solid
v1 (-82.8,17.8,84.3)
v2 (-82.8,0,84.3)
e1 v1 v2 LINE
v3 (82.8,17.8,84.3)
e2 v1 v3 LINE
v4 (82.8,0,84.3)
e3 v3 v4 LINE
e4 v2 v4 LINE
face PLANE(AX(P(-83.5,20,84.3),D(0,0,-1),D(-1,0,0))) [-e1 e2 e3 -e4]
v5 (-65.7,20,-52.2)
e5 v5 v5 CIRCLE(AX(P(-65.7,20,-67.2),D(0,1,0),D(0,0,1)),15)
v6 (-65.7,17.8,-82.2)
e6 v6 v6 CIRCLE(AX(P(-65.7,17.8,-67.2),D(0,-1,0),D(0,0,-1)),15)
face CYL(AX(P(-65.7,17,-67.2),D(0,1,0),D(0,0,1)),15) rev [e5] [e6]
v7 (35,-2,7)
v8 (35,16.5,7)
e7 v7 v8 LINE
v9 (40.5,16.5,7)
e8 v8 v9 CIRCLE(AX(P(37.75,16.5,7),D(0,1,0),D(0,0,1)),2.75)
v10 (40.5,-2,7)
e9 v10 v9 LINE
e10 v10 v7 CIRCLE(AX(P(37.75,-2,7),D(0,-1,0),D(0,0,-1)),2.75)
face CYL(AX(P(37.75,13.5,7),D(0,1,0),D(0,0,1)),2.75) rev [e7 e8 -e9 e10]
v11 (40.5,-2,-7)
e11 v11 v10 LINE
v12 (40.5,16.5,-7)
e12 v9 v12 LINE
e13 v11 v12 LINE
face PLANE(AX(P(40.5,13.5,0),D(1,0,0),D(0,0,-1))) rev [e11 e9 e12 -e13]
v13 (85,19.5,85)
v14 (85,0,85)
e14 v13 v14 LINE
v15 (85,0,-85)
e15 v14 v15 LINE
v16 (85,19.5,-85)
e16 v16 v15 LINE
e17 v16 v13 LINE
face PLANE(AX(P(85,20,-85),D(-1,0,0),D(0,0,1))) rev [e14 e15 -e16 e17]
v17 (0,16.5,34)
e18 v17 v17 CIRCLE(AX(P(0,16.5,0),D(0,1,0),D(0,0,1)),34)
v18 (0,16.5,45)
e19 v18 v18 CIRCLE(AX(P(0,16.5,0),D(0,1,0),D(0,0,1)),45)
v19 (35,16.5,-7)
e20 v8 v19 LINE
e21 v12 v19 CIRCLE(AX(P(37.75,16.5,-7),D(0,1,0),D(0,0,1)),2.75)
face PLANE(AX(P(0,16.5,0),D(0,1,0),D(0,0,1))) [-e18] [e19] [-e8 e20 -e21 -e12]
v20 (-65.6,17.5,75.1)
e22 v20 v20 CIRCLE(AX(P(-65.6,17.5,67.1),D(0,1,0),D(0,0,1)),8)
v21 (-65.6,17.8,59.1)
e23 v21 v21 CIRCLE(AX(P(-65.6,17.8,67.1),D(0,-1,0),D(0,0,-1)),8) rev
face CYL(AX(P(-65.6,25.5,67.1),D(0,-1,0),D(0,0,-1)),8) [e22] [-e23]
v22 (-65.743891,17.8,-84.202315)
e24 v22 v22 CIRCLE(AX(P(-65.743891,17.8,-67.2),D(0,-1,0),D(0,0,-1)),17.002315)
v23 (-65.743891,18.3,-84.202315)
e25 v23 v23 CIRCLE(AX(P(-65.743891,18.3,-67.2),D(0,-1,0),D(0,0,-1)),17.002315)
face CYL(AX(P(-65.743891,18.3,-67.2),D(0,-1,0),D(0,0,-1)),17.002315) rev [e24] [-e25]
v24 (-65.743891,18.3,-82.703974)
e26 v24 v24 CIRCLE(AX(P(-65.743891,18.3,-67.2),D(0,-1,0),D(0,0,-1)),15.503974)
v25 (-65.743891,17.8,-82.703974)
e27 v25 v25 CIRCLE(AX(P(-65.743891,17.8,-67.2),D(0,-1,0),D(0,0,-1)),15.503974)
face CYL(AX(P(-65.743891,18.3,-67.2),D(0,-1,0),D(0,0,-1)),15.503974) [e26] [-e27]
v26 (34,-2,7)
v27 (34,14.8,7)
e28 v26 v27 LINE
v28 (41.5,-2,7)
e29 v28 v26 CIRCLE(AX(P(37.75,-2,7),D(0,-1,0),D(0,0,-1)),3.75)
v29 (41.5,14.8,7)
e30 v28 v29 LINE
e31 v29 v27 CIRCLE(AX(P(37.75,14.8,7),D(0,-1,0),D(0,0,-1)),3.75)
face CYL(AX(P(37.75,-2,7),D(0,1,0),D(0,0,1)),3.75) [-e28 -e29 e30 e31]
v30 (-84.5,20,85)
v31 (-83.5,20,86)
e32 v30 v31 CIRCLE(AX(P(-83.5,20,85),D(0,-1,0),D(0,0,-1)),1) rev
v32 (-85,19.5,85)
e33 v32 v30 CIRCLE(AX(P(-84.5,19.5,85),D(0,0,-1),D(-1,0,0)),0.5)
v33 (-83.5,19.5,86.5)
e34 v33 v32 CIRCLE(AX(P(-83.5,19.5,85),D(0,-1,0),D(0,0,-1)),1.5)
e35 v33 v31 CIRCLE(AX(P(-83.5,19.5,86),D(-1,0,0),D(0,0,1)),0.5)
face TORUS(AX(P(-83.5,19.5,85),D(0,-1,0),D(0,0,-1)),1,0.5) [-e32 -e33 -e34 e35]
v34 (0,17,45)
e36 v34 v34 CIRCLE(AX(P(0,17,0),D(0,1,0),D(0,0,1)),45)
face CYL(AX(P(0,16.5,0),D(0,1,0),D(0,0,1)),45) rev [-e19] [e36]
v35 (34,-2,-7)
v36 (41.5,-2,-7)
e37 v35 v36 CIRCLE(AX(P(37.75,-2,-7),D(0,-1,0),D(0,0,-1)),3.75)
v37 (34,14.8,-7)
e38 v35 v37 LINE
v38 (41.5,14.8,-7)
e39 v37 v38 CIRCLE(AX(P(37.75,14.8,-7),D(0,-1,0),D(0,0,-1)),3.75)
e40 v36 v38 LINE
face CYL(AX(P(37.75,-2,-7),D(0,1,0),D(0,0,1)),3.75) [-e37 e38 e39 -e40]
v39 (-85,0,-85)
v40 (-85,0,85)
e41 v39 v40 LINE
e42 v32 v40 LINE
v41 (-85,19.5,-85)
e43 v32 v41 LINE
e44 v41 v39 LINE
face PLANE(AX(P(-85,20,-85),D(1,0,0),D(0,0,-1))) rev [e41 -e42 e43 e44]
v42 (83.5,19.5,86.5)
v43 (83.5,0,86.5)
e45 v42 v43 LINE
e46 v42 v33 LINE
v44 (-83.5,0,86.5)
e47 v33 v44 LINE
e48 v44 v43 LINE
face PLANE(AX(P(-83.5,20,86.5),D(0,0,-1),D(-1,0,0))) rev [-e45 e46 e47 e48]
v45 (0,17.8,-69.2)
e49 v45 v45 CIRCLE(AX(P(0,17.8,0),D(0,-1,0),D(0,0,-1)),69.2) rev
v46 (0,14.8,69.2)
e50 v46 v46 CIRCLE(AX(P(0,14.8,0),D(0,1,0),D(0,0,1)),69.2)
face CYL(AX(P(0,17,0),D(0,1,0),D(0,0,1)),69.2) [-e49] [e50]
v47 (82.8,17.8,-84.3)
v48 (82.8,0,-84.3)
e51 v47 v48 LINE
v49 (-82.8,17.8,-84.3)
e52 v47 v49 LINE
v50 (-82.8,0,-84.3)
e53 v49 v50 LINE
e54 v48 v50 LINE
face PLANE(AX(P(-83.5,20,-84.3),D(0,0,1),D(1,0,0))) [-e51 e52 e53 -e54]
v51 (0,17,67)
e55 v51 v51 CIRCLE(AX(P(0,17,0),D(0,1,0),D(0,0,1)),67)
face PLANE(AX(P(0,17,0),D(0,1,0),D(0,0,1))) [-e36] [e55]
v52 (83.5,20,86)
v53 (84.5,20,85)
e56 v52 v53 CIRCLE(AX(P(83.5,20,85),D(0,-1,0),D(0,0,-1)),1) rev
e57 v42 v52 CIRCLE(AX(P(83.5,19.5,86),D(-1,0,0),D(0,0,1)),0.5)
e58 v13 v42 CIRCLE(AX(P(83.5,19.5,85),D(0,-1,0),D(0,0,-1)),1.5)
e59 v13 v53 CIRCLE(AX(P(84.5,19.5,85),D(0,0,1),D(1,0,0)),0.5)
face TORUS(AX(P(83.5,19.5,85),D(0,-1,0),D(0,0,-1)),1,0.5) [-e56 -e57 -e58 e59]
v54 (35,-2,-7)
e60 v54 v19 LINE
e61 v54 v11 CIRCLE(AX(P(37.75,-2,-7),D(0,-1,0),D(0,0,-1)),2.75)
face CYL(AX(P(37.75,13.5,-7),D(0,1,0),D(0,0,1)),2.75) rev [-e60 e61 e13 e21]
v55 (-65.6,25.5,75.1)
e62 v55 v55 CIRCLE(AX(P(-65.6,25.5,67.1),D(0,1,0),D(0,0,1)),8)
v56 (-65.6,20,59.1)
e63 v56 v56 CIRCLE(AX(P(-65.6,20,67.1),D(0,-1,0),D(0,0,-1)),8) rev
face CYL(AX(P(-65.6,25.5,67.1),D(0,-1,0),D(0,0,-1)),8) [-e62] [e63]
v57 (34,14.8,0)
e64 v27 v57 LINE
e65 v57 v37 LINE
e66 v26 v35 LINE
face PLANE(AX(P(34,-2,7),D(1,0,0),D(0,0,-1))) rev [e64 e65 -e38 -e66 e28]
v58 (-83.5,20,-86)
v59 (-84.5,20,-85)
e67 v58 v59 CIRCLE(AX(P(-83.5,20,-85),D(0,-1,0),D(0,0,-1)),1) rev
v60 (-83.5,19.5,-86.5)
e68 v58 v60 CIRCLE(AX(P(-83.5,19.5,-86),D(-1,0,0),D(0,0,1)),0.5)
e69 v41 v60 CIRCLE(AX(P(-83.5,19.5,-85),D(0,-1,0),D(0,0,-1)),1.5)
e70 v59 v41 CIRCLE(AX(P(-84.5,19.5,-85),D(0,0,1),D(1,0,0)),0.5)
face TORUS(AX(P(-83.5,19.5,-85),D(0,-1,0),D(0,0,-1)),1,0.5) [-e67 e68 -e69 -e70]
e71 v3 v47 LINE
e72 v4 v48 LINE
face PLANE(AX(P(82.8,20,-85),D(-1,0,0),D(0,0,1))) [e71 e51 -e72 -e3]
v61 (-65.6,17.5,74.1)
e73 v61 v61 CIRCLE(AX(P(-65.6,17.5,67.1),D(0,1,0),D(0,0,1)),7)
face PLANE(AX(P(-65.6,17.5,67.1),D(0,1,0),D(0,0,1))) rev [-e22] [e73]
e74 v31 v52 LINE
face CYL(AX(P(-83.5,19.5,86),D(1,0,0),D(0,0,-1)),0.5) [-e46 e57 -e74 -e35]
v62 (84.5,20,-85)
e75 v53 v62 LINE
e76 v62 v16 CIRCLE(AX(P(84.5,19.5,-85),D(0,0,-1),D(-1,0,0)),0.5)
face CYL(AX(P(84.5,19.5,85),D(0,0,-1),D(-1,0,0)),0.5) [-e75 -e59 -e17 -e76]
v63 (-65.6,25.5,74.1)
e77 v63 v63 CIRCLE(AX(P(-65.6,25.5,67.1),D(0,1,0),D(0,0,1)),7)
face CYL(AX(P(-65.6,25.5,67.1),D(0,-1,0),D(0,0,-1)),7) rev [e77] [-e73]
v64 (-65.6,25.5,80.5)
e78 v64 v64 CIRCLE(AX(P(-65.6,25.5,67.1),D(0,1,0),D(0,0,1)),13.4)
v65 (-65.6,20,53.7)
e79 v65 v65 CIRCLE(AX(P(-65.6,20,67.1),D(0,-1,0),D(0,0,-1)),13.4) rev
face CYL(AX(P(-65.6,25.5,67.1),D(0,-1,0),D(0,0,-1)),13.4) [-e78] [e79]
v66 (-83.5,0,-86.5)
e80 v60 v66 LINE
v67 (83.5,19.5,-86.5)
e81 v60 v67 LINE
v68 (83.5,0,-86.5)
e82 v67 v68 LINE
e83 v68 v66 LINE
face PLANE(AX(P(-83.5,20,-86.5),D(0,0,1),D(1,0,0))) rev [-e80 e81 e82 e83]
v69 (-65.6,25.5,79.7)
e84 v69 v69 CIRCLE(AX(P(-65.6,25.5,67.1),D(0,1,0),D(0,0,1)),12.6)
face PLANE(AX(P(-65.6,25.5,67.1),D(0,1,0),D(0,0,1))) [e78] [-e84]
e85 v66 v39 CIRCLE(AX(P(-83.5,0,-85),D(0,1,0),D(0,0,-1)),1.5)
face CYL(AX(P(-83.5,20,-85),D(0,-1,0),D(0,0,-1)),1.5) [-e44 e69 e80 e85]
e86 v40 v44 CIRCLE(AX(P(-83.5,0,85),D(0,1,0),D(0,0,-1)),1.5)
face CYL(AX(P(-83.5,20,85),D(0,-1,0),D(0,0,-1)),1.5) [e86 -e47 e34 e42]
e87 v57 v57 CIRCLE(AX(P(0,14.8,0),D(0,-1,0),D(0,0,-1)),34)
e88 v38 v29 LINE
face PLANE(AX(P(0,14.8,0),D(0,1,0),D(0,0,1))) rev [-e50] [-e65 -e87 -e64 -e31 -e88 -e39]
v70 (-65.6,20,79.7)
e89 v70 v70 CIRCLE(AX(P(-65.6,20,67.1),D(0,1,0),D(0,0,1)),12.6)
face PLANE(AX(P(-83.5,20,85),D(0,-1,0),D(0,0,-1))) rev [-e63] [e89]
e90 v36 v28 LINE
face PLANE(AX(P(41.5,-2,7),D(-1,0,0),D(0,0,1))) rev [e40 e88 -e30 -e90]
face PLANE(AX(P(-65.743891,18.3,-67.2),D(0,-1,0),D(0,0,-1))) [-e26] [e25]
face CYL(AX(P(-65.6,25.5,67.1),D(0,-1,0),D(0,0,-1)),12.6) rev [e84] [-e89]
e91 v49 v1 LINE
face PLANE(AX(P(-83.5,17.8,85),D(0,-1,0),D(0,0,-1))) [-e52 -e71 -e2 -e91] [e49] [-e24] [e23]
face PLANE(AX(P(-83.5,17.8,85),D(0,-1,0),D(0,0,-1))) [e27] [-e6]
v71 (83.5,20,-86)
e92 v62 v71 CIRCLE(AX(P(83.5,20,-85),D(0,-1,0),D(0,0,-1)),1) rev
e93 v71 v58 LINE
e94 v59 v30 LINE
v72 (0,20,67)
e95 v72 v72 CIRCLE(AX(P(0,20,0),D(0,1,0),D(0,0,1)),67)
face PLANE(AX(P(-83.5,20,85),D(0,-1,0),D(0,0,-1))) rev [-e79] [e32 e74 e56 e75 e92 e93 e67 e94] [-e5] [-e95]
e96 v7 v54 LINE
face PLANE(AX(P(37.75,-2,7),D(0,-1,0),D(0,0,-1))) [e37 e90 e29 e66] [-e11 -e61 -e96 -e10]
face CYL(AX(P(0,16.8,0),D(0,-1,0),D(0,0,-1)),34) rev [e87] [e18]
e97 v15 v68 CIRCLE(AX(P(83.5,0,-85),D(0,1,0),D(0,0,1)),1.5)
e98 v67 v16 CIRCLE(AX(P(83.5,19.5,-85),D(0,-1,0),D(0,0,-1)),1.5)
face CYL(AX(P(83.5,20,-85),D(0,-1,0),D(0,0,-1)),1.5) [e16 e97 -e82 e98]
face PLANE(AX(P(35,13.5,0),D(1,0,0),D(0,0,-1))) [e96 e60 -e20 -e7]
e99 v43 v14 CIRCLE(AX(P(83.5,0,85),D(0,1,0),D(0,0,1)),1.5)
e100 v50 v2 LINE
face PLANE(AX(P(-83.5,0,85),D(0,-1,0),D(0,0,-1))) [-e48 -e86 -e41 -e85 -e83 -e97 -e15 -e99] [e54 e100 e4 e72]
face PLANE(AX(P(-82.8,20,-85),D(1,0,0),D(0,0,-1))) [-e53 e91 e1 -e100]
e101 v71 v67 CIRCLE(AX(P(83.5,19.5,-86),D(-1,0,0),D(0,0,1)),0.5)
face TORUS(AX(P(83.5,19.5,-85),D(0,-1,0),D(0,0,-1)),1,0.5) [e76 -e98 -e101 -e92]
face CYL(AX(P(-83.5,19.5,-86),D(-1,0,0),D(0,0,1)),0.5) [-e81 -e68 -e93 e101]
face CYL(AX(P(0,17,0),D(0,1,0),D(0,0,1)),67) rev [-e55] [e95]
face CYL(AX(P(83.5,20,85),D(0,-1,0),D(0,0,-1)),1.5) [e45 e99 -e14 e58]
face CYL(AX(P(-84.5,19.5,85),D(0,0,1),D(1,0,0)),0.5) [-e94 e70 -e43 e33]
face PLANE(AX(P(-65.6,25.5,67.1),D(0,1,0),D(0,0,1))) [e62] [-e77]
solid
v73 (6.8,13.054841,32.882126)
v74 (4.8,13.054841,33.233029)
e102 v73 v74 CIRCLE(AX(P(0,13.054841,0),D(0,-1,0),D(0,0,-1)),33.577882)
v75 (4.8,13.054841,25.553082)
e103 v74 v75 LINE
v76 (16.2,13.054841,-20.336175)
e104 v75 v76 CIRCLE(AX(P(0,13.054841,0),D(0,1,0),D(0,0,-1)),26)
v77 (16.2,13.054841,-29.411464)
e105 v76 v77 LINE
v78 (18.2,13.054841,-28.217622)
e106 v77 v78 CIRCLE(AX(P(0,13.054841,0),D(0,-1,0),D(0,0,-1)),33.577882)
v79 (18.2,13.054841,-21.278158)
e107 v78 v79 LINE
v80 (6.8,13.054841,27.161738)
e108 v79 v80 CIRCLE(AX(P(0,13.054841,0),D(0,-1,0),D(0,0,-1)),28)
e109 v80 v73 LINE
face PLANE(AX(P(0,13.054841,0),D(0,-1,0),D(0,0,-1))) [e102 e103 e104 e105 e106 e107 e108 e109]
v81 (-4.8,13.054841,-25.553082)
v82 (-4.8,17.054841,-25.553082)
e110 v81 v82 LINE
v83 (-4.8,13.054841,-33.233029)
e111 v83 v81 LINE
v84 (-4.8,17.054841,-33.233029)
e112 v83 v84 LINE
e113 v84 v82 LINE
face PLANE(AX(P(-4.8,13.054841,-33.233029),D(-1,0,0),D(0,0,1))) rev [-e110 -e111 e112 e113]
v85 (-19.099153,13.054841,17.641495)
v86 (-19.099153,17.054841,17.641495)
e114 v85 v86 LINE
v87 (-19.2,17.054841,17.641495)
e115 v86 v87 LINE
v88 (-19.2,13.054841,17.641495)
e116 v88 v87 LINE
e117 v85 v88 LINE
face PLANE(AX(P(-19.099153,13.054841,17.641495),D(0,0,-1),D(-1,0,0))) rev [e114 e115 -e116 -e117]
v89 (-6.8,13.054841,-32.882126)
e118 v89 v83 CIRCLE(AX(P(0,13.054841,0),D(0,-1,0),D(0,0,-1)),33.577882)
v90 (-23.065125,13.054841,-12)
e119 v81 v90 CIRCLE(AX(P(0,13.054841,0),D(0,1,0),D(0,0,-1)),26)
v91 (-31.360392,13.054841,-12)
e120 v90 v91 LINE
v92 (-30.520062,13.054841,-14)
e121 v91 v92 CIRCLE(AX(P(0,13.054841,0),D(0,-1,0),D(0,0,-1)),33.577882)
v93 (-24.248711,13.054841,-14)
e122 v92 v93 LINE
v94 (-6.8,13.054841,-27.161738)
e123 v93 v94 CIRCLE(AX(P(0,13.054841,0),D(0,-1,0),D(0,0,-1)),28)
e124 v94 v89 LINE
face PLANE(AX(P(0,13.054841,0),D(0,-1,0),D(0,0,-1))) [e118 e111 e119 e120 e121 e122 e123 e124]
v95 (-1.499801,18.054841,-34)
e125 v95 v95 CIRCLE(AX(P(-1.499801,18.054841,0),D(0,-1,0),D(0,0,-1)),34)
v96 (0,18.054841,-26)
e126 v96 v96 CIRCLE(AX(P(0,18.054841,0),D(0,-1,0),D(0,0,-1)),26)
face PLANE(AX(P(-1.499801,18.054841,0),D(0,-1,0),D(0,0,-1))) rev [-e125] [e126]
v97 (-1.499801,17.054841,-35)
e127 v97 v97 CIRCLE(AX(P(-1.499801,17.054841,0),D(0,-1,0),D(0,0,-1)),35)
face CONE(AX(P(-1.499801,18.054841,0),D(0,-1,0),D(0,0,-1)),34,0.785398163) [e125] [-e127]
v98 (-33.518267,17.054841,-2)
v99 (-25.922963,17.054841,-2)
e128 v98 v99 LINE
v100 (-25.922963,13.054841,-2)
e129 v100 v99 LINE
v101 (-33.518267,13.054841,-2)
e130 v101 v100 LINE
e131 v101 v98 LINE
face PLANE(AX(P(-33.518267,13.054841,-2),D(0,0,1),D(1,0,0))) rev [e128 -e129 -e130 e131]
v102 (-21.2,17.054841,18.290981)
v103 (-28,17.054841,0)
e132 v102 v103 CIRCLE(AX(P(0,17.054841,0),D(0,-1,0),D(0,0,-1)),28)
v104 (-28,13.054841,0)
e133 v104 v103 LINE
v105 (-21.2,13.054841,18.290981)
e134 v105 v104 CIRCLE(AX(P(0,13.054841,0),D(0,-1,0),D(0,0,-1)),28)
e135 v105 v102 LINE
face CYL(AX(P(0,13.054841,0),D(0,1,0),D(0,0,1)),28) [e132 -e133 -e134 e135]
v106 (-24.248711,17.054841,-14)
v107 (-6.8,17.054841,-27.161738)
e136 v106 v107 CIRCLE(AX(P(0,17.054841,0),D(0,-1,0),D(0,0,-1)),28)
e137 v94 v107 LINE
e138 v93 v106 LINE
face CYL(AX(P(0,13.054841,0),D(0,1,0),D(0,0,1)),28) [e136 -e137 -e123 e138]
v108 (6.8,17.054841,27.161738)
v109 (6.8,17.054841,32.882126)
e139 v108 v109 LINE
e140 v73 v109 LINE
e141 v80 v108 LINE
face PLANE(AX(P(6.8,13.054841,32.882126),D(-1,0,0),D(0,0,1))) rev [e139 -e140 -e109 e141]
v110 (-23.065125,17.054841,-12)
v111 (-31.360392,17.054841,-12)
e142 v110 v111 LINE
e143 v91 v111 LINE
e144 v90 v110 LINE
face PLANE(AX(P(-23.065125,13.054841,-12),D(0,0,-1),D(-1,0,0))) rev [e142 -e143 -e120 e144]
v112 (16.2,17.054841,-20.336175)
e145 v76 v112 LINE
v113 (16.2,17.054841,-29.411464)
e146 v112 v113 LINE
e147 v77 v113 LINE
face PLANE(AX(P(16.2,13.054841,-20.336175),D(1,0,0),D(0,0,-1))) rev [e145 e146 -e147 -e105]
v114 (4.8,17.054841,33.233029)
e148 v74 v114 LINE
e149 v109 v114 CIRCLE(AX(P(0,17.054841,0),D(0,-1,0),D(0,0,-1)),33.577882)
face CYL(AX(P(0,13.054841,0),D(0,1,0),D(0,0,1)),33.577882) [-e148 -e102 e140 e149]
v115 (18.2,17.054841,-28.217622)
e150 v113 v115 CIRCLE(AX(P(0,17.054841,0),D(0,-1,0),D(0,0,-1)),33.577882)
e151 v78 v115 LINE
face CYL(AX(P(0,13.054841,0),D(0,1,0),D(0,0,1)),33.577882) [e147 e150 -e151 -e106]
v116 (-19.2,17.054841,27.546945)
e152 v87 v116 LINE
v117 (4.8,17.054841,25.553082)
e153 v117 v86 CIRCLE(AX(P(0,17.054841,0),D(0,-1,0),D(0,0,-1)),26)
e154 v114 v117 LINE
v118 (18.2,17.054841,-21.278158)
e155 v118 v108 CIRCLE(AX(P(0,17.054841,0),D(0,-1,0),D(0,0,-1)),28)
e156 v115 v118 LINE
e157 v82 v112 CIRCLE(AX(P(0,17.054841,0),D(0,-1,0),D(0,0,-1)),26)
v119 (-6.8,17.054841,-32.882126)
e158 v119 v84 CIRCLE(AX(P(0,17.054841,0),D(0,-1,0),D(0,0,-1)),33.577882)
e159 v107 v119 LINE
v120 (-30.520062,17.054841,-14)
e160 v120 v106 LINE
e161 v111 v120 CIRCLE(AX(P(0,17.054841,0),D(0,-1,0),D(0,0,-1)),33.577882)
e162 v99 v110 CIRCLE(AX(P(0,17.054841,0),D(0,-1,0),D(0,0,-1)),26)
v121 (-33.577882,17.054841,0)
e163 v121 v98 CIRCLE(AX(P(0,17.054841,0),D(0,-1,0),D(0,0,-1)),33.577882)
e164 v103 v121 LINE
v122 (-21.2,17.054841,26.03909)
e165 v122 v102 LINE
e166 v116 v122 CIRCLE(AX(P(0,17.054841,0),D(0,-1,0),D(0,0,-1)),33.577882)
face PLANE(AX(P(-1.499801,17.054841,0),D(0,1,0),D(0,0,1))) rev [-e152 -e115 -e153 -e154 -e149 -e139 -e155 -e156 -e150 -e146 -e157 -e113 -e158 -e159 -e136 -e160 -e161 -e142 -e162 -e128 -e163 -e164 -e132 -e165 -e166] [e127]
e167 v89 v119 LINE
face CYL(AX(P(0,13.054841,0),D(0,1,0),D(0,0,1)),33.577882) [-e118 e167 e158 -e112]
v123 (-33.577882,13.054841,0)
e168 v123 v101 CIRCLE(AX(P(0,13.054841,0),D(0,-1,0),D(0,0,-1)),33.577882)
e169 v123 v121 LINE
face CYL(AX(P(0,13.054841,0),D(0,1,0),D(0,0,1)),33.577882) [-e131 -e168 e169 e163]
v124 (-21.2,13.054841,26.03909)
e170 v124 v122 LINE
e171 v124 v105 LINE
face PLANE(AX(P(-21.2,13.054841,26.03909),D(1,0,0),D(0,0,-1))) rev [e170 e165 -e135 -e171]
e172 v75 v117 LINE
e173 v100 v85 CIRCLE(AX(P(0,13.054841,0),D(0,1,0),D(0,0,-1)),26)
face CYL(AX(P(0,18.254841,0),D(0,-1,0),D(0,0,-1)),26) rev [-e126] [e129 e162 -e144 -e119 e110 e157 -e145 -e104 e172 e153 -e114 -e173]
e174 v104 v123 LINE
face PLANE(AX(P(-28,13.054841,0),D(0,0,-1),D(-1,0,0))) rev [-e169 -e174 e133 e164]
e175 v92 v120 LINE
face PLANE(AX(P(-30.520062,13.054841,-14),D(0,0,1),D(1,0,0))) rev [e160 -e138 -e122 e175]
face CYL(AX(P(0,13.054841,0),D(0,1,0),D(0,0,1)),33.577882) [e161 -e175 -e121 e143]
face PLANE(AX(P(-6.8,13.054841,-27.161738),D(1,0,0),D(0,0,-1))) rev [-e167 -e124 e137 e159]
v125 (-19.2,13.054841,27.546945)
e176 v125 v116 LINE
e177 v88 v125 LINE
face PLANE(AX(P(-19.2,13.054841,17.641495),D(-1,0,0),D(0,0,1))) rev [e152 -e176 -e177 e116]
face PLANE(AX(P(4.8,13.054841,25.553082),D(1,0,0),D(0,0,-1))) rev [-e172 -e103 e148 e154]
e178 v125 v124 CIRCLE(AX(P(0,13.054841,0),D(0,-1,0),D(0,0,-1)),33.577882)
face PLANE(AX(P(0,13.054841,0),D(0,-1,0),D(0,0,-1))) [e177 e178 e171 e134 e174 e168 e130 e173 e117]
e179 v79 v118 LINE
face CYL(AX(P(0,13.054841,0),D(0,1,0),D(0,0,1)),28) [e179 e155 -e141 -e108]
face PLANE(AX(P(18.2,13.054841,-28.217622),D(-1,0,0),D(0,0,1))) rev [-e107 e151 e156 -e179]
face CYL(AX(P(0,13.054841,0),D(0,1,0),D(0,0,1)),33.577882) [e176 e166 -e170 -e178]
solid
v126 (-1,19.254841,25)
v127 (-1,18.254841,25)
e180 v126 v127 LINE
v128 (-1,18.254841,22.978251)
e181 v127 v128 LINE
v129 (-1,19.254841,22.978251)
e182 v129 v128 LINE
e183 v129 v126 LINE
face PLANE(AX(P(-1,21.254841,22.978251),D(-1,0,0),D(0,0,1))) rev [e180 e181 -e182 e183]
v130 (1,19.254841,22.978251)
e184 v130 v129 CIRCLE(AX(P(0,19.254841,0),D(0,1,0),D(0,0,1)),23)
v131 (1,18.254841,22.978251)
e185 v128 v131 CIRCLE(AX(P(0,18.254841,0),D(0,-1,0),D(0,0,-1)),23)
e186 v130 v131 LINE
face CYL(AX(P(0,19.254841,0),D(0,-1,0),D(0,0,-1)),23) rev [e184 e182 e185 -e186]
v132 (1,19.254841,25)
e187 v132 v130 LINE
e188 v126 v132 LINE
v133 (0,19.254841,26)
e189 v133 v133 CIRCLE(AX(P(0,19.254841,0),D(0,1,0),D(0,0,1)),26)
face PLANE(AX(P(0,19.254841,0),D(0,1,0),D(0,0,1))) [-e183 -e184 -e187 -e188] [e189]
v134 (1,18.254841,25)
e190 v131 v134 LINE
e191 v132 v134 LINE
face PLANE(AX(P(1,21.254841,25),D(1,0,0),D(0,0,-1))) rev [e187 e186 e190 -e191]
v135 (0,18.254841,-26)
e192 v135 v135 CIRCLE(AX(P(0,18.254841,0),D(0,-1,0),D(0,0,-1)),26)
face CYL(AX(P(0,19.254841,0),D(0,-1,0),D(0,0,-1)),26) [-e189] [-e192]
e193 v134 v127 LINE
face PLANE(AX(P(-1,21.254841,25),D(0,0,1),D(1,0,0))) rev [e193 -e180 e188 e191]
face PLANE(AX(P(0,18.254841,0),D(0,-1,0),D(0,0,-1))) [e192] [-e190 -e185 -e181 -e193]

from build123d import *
from build123d.topology import SkipClean

# Parameters (mm, degrees)
EXTRUDE_1_DEPTH          = 20
SKETCH_4_R               = 67
CUT_EXTRUDE_2_DEPTH      = 3
SHELL_9_T                = -2.2
SKETCH_9_R               = 45
CUT_EXTRUDE_3_DEPTH      = 0.5
SKETCH_11_R              = 26
SKETCH_11_R_2            = 23
EXTRUDE_2_DEPTH          = 1.2
SKETCH_14_R              = 23
CUT_EXTRUDE_4_DEPTH      = 5
SKETCH_15_R              = 34
CUT_EXTRUDE_5_DEPTH      = 2
SKETCH_16_R              = 26
CUT_EXTRUDE_9_DEPTH      = 1.2
EXTRUDE_4_DEPTH          = 4
CUT_EXTRUDE_10_DEPTH     = 3
CUT_EXTRUDE_START        = 17.8
CUT_EXTRUDE_11_OUTLINE_R = 15
CUT_EXTRUDE_11_DEPTH     = 2.2
SKETCH_25_R              = 17.002315459
SKETCH_25_R_2            = 15.503974497
CUT_EXTRUDE_12_DEPTH     = 0.5
SKETCH_26_R              = 13.4
SKETCH_26_R_2            = 12.6
EXTRUDE_5_DEPTH          = 5.5
EXTRUDE_6_DEPTH          = 5.5
EXTRUDE_6_DEPTH_BACK     = 2.5
SKETCH_27_R              = 8
SKETCH_27_R_2            = 7
SKETCH_28_R              = 7
CUT_EXTRUDE_13_DEPTH     = 3
FILLET_1_R               = 0.5
CUT_EXTRUDE_14_DEPTH     = 3
EXTRUDE_7_DEPTH          = 16.8


# Read off the part's stored shape, not the designer's step: 切除-拉伸11
with BuildPart() as part:
    # 草图2 → 凸台-拉伸1 (new body)
    with BuildSketch(Plane(origin=(0, 0, 0), x_dir=(1, 0, 0), z_dir=(0, 1, 0))):
        with BuildLine():
            Line((-83.5, 86.5), (83.5, 86.5))
            ThreePointArc((83.5, 86.5), (84.560660172, 86.060660172), (85, 85))
            Line((85, 85), (85, -85))
            ThreePointArc((85, -85), (84.560660172, -86.060660172), (83.5, -86.5))
            Line((83.5, -86.5), (-83.5, -86.5))
            ThreePointArc((-83.5, -86.5), (-84.560660172, -86.060660172), (-85, -85))
            Line((-85, -85), (-85, 85))
            ThreePointArc((-85, 85), (-84.560660172, 86.060660172), (-83.5, 86.5))
        make_face()
    extrude(amount=EXTRUDE_1_DEPTH)

    # 草图4 → 切除-拉伸2 (cut)
    with BuildSketch(Plane(origin=(0, 20, 0), x_dir=(1, 0, 0), z_dir=(0, 1, 0))):
        with Locations(Location((0, 0, 0), (0, 0, 270))):
            Circle(SKETCH_4_R)
    extrude(amount=-CUT_EXTRUDE_2_DEPTH, mode=Mode.SUBTRACT)

    # 抽壳9
    shell_9_openings = [part.faces().sort_by_distance(p)[0] for p in [
        (0, 0, 0),
    ]]
    offset(amount=SHELL_9_T, openings=shell_9_openings, kind=Kind.INTERSECTION)

    # 草图9 → 切除-拉伸3 (cut)
    with BuildSketch(Plane(origin=(0, 17, 0), x_dir=(1, 0, 0), z_dir=(0, 1, 0))):
        with Locations(Location((0, 0, 0), (0, 0, 270))):
            Circle(SKETCH_9_R)
    extrude(amount=-CUT_EXTRUDE_3_DEPTH, mode=Mode.SUBTRACT)


with BuildPart() as body_2:
    # 草图10 → 旋转1 (revolve)
    with BuildSketch(Plane.XY, mode=Mode.PRIVATE) as revolve_1_sk:
        Polygon((-1.499800563, 17.05484119), (-36.499800563, 17.05484119), (-35.499800563, 18.05484119), (-1.499800563, 18.05484119), align=None)
    revolve(revolve_1_sk.sketch.rotate(Axis((-1.499800563, 17.05484119, 0), (0, 1, 0)), 270), axis=Axis((-1.499800563, 17.05484119, 0), (0, 1, 0)))

    # 草图11 → 凸台-拉伸2 (add)
    with BuildSketch(Plane(origin=(0, 18.05484119, 0), x_dir=(1, 0, 0), z_dir=(0, 1, 0))):
        with Locations(Location((0, 0, 0), (0, 0, 90))):
            Circle(SKETCH_11_R)
        with Locations(Location((0, 0, 0), (0, 0, 270))):
            Circle(SKETCH_11_R_2, mode=Mode.SUBTRACT)
    extrude(amount=EXTRUDE_2_DEPTH)


with BuildPart() as cut_extrude_4_tool:
    # 草图14 → 切除-拉伸4 (new body)
    with BuildSketch(Plane(origin=(0, 18.05484119, 0), x_dir=(1, 0, 0), z_dir=(0, 1, 0))):
        with Locations(Location((0, 0, 0), (0, 0, 270))):
            Circle(SKETCH_14_R)
    extrude(amount=-CUT_EXTRUDE_4_DEPTH)


with BuildPart() as part_1:
    add(part.part)

    # 切除-拉伸4: cut by cut_extrude_4_tool
    add(cut_extrude_4_tool.part, mode=Mode.SUBTRACT)

    # 草图15 → 切除-拉伸5 (cut)
    with BuildSketch(Plane.XZ.offset(-14.8)):
        with Locations(Location((0, 0, 0), (0, 0, 270))):
            Circle(SKETCH_15_R)
    extrude(amount=-CUT_EXTRUDE_5_DEPTH, mode=Mode.SUBTRACT)

    # 切除-拉伸11 outline → 切除-拉伸11 (cut)
    with BuildSketch(Plane(origin=(0, 0, 0), x_dir=(1, 0, 0), z_dir=(0, 1, 0)).offset(CUT_EXTRUDE_START)):
        with Locations((-65.7, 67.2)):
            Circle(CUT_EXTRUDE_11_OUTLINE_R)
    extrude(amount=CUT_EXTRUDE_11_DEPTH, mode=Mode.SUBTRACT)

    # 草图25 → 切除-拉伸12 (cut)
    with BuildSketch(Plane.XZ.offset(-17.8)):
        with Locations(Location((-65.7438908, -67.2, 0), (0, 0, 270))):
            Circle(SKETCH_25_R)
        with Locations(Location((-65.7438908, -67.2, 0), (0, 0, 270))):
            Circle(SKETCH_25_R_2, mode=Mode.SUBTRACT)
    extrude(amount=-CUT_EXTRUDE_12_DEPTH, mode=Mode.SUBTRACT)

    # 草图26 → 凸台-拉伸5 (add)
    with BuildSketch(Plane(origin=(0, 20, 0), x_dir=(1, 0, 0), z_dir=(0, 1, 0))):
        with Locations(Location((-65.6, -67.1, 0), (0, 0, 90))):
            Circle(SKETCH_26_R)
        with Locations(Location((-65.6, -67.1, 0), (0, 0, 270))):
            Circle(SKETCH_26_R_2, mode=Mode.SUBTRACT)
    extrude(amount=EXTRUDE_5_DEPTH)

    # 草图27 → 凸台-拉伸6 (add, two sides: drawn at the far end of the back side and taken through both)
    with BuildSketch(Plane(origin=(0, 20, 0), x_dir=(1, 0, 0), z_dir=(0, 1, 0)).offset(-EXTRUDE_6_DEPTH_BACK)):
        with Locations(Location((-65.6, -67.1, 0), (0, 0, 90))):
            Circle(SKETCH_27_R)
        with Locations(Location((-65.6, -67.1, 0), (0, 0, 90))):
            Circle(SKETCH_27_R_2, mode=Mode.SUBTRACT)
    extrude(amount=EXTRUDE_6_DEPTH + EXTRUDE_6_DEPTH_BACK)

    # 草图28 → 切除-拉伸13 (cut)
    with SkipClean():  # the faces are left unmerged after this step: merging them gives an invalid solid
        with BuildSketch(Plane(origin=(0, 20, 0), x_dir=(1, 0, 0), z_dir=(0, 1, 0))):
            with Locations(Location((-65.6, -67.1, 0), (0, 0, 270))):
                Circle(SKETCH_28_R)
        extrude(amount=-CUT_EXTRUDE_13_DEPTH, mode=Mode.SUBTRACT)
    add(part_1.part.scale(1), mode=Mode.REPLACE)  # the faces are merged on a copy

    # 圆角1
    fillet_1_edges = [part_1.edges().sort_by_distance(p)[0] for p in [
        (84.560660172, 20, 86.060660172),
        (85, 20, 0),
        (84.560660172, 20, -86.060660172),
        (0, 20, -86.5),
        (-84.560660172, 20, -86.060660172),
        (-85, 20, 0),
        (-84.560660172, 20, 86.060660172),
        (0, 20, 86.5),
    ]]
    fillet(fillet_1_edges, radius=FILLET_1_R)

    # 草图30 → 切除-拉伸14 (cut)
    with BuildSketch(Plane(origin=(0, 16.5, 0), x_dir=(1, 0, 0), z_dir=(0, 1, 0))):
        with BuildLine():
            Line((35, -7), (35, 7))
            ThreePointArc((35, 7), (37.75, 9.75), (40.5, 7))
            Line((40.5, 7), (40.5, -7))
            ThreePointArc((40.5, -7), (37.75, -9.75), (35, -7))
        make_face()
    extrude(amount=-CUT_EXTRUDE_14_DEPTH, mode=Mode.SUBTRACT)

    # 草图31 → 凸台-拉伸7 (add)
    with SkipClean():  # the faces are left unmerged after this step: merging them gives an invalid solid
        with BuildSketch(Plane.XZ.offset(-14.8)):
            with BuildLine():
                Line((41.5, 7), (41.5, -7))
                ThreePointArc((41.5, -7), (37.75, -10.75), (34, -7))
                Line((34, -7), (34, 7))
                ThreePointArc((34, 7), (37.75, 10.75), (41.5, 7))
            make_face()
            with BuildLine():
                Line((40.5, 7), (40.5, -7))
                ThreePointArc((40.5, -7), (37.75, -9.75), (35, -7))
                Line((35, -7), (35, 7))
                ThreePointArc((35, 7), (37.75, 9.75), (40.5, 7))
            make_face(mode=Mode.SUBTRACT)
        extrude(amount=EXTRUDE_7_DEPTH)


with BuildPart() as body_2_1:
    add(body_2.part)

    # 切除-拉伸4: cut by cut_extrude_4_tool
    add(cut_extrude_4_tool.part, mode=Mode.SUBTRACT)

    # 草图16 → 切除-拉伸9 (cut)
    with BuildSketch(Plane.XZ.offset(-17.05484119)):
        with Locations(Location((0, 0, 0), (0, 0, 270))):
            Circle(SKETCH_16_R)
    extrude(amount=-CUT_EXTRUDE_9_DEPTH, mode=Mode.SUBTRACT)


with BuildPart() as cut_extrude_9_piece_1:
    # of the separate pieces the step leaves, piece 1, a body of its own (cut_extrude_9_pieces)
    add(body_2_1.part.solids().sort_by_distance((-1.499800563, 17.05484119, -35))[0])

    # 草图21 → 凸台-拉伸4 (add)
    with BuildSketch(Plane.XZ.offset(-17.05484119)):
        with BuildLine():
            Line((-6.8, -27.161737794), (-6.8, -32.88212568))
            ThreePointArc((-6.8, -32.88212568), (-5.802653118, -33.072698802), (-4.8, -33.23302859))
            Line((-4.8, -33.23302859), (-4.8, -25.553082006))
            ThreePointArc((-4.8, -25.553082006), (-15.493153598, -20.879707651), (-23.065125189, -12))
            Line((-23.065125189, -12), (-31.360392046, -12))
            ThreePointArc((-31.360392046, -12), (-30.956383036, -13.006788174), (-30.520062078, -14))
            Line((-30.520062078, -14), (-24.248711306, -14))
            ThreePointArc((-24.248711306, -14), (-16.861597015, -22.353669634), (-6.8, -27.161737794))
        make_face()
        with BuildLine():
            Line((16.2, -20.336174665), (16.2, -29.411463569))
            ThreePointArc((16.2, -29.411463569), (17.210354861, -28.831889893), (18.2, -28.217621963))
            Line((18.2, -28.217621963), (18.2, -21.278157815))
            ThreePointArc((18.2, -21.278157815), (27.255382435, 6.414368897), (6.8, 27.161737794))
            Line((6.8, 27.161737794), (6.8, 32.88212568))
            ThreePointArc((6.8, 32.88212568), (5.802653118, 33.072698802), (4.8, 33.23302859))
            Line((4.8, 33.23302859), (4.8, 25.553082006))
            ThreePointArc((4.8, 25.553082006), (25.233033299, 6.268495079), (16.2, -20.336174665))
        make_face()
        with BuildLine():
            Line((-19.099153457, 17.641494756), (-19.2, 17.641494756))
            Line((-19.2, 17.641494756), (-19.2, 27.546945189))
            ThreePointArc((-19.2, 27.546945189), (-20.214064586, 26.811672499), (-21.2, 26.03908964))
            Line((-21.2, 26.03908964), (-21.2, 18.290981384))
            ThreePointArc((-21.2, 18.290981384), (-26.244999524, 9.757048734), (-28, 0))
            Line((-28, 0), (-33.577882442, 0))
            ThreePointArc((-33.577882442, 0), (-33.562975147, -1.000444159), (-33.518266501, -2))
            Line((-33.518266501, -2), (-25.922962794, -2))
            ThreePointArc((-25.922962794, -2), (-24.560024776, 8.532595327), (-19.099153457, 17.641494756))
        make_face()
    extrude(amount=EXTRUDE_4_DEPTH)


with BuildPart() as cut_extrude_9_piece_2:
    # of the separate pieces the step leaves, piece 2, a body of its own (cut_extrude_9_pieces)
    add(body_2_1.part.solids().sort_by_distance((0, 18.25484119, -26))[0])

    # 草图22 → 切除-拉伸10 (cut)
    with BuildSketch(Plane.XZ.offset(-18.25484119)):
        with BuildLine():
            Line((-1, 22.978250586), (-1, 25))
            Line((-1, 25), (1, 25))
            Line((1, 25), (1, 22.978250586))
            ThreePointArc((1, 22.978250586), (0, 23), (-1, 22.978250586))
        make_face()
    extrude(amount=-CUT_EXTRUDE_10_DEPTH, mode=Mode.SUBTRACT)


solid = Compound([part_1.part, cut_extrude_9_piece_1.part, cut_extrude_9_piece_2.part])
